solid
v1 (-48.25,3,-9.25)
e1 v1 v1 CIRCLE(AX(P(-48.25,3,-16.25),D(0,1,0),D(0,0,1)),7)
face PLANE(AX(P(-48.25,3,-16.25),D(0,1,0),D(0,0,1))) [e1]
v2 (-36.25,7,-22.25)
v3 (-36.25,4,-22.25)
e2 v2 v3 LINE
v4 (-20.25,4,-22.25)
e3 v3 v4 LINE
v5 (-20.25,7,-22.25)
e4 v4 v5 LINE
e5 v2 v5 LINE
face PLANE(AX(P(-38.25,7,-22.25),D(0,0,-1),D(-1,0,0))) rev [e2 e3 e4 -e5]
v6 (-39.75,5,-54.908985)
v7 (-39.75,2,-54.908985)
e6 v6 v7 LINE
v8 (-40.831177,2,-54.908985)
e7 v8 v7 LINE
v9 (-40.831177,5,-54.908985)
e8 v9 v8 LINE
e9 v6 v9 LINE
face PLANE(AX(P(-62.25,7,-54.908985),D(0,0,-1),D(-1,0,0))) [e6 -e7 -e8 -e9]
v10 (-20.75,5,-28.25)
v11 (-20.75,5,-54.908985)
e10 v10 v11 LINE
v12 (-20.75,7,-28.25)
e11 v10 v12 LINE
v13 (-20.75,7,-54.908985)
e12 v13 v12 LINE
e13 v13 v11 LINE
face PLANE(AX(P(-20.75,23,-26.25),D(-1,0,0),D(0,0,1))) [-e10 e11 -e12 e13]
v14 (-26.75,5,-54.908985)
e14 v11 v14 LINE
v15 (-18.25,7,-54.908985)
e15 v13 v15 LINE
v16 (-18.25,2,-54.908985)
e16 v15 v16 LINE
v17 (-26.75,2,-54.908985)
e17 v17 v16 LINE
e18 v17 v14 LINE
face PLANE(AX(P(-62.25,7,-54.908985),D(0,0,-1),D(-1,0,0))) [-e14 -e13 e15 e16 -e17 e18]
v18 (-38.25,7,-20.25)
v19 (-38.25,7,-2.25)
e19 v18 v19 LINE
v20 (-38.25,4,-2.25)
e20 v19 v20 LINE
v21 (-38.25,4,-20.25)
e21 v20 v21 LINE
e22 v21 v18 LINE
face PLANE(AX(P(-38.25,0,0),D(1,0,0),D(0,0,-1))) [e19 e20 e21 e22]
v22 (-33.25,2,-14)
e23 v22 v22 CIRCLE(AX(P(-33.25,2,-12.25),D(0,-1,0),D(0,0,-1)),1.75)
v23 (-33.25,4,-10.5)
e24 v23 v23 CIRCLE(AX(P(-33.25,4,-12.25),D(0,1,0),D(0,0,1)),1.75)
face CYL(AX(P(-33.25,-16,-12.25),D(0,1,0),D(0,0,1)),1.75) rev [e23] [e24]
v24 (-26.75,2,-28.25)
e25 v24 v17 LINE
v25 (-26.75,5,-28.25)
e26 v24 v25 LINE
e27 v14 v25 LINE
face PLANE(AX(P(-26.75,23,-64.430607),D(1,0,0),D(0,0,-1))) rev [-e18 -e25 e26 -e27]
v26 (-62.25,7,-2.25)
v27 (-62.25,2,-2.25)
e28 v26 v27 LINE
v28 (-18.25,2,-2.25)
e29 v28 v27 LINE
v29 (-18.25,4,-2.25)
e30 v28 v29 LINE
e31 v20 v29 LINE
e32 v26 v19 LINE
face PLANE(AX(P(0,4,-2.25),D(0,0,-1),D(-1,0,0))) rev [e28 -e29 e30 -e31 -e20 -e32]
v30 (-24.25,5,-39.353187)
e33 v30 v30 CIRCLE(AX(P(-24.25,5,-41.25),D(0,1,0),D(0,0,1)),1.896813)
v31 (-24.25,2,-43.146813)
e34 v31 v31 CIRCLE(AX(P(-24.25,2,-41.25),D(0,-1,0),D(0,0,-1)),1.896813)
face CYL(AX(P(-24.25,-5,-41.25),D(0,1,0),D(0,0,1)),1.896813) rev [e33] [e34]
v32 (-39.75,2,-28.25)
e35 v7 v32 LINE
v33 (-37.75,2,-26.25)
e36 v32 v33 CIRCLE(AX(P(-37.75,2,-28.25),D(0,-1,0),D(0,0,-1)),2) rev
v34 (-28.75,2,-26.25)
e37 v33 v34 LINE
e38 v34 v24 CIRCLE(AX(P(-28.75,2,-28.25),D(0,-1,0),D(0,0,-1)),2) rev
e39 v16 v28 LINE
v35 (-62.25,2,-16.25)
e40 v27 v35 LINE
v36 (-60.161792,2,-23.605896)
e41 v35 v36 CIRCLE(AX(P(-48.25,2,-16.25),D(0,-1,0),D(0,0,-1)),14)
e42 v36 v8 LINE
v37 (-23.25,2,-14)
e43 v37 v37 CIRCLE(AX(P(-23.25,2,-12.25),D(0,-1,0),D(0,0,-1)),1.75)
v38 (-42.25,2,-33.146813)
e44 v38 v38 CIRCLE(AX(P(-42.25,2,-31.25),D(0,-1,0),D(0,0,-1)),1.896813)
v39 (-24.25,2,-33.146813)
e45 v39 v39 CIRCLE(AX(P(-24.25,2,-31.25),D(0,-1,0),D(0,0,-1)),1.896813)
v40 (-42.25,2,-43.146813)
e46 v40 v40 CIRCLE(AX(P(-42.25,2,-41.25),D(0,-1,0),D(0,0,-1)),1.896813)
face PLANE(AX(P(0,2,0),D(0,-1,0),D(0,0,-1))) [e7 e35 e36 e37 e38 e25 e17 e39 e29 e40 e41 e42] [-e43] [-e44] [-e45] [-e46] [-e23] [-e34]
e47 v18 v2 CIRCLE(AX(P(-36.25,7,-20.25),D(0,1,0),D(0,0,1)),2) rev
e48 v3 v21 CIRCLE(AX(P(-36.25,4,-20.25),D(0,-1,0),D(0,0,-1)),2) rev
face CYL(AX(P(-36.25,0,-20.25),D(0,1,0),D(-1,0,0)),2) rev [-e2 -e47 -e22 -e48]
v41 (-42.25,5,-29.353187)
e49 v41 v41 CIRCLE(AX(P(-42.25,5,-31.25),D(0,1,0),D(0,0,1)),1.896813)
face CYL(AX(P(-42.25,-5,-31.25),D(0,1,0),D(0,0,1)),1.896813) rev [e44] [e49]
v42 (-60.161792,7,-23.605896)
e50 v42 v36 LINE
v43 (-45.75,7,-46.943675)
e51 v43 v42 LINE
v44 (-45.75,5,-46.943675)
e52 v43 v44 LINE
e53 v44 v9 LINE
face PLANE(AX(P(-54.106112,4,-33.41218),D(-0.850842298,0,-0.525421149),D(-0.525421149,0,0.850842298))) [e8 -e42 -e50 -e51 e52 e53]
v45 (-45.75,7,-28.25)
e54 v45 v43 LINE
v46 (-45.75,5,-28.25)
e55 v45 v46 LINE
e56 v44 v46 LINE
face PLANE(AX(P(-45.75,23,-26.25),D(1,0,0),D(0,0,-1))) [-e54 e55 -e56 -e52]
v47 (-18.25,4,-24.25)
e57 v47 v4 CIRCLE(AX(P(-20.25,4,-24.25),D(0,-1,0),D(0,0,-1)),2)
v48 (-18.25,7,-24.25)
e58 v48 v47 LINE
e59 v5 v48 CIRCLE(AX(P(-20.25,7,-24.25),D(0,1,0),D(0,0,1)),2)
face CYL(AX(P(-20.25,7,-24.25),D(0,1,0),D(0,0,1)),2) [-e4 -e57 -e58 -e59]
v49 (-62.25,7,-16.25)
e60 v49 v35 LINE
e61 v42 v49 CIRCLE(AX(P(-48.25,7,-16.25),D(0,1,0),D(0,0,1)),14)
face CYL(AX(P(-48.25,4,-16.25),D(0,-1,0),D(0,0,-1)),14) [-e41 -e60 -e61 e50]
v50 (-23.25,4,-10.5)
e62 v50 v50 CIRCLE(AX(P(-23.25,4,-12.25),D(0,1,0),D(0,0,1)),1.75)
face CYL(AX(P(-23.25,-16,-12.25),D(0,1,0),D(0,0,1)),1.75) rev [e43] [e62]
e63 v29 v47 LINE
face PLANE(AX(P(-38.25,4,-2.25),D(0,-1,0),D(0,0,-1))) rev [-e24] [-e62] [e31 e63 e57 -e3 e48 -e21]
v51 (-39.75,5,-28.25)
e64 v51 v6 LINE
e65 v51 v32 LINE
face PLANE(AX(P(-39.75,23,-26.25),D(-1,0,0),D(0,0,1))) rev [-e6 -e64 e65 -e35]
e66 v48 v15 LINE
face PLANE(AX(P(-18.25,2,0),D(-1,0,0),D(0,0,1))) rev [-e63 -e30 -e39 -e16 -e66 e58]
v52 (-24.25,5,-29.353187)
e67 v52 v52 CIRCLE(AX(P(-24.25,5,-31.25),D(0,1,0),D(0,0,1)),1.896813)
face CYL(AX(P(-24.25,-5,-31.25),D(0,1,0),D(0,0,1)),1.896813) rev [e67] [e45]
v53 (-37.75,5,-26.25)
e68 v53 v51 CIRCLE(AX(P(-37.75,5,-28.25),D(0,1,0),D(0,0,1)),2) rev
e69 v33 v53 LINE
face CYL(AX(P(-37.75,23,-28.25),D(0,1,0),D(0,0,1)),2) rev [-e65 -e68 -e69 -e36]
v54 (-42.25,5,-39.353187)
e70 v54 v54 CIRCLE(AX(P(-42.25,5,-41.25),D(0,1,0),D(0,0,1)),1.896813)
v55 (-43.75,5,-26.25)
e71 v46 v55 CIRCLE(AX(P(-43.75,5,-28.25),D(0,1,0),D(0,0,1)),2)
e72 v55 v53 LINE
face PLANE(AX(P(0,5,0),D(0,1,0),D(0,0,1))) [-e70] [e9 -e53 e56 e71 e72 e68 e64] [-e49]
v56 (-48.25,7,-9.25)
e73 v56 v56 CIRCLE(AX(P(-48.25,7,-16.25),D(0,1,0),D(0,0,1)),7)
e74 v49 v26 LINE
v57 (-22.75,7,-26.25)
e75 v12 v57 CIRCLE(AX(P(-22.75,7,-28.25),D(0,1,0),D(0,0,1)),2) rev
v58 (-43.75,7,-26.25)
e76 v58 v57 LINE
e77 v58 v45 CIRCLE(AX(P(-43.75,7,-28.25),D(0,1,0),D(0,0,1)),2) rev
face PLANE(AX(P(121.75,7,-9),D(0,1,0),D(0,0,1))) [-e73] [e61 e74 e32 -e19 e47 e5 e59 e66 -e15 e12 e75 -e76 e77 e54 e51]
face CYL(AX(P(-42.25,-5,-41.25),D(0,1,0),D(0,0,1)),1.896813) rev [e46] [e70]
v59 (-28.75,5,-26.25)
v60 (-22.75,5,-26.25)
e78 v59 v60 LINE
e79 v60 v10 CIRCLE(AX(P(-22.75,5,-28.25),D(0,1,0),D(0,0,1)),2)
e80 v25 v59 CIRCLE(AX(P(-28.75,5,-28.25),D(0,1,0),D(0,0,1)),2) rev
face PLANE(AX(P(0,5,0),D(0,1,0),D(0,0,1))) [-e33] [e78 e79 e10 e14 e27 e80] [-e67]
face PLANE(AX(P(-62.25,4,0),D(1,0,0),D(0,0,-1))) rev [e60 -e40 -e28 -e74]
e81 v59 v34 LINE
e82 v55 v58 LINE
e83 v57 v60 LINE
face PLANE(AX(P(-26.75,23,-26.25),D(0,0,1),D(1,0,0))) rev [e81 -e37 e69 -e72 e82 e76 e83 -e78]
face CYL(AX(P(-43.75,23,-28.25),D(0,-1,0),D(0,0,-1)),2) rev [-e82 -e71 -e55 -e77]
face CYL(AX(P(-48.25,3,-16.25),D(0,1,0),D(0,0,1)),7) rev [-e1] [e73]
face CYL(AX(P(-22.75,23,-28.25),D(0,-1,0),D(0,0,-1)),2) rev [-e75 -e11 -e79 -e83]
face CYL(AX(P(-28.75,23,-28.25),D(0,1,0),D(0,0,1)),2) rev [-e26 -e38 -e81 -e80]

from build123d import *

# Parameters (mm, degrees)
SKETCH_1_W           = 35
SKETCH_1_H           = 55
EXTRUDE_1_DEPTH      = 1
EXTRUDE_2_DEPTH      = 3
SKETCH_3_R           = 5
CUT_EXTRUDE_1_DEPTH  = 169.569903897
SKETCH_4_R           = 4
CUT_EXTRUDE_2_DEPTH  = 2
SKETCH_5_R           = 2
CUT_EXTRUDE_3_DEPTH  = 2
EXTRUDE_START        = 7
EXTRUDE_3_DEPTH      = 7
CUT_EXTRUDE_START    = -1.5
SKETCH_9_W           = 10
SKETCH_9_H           = 26
CUT_EXTRUDE_4_DEPTH  = 168.318874833
SKETCH_10_R          = 1.5
CUT_EXTRUDE_5_DEPTH  = 194.595583627
EXTRUDE_4_DEPTH      = 3
SKETCH_13_W          = 334.012533363
SKETCH_13_H          = 161.456209481
CUT_EXTRUDE_6_DEPTH  = 10
CUT_EXTRUDE_START_2  = -0.5
SKETCH_14_R          = 3.5
CUT_EXTRUDE_7_DEPTH  = 179.354165453
SKETCH_15_R          = 5
CUT_EXTRUDE_8_DEPTH  = 179.854165453
EXTRUDE_START_2      = -3
EXTRUDE_5_DEPTH      = 16
EXTRUDE_7_DEPTH      = 7
SKETCH_24_W          = 10
SKETCH_24_H          = 26
CUT_EXTRUDE_11_DEPTH = 180.209193181
SKETCH_25_R          = 1.5
CUT_EXTRUDE_12_DEPTH = 176.793913433
THREAD_2_PITCH       = 0.6
CUT_EXTRUDE_13_DEPTH = 181.709193232
EXTRUDE_START_3      = 2
SKETCH_27_R          = 5
EXTRUDE_8_DEPTH      = 2
CUT_EXTRUDE_START_3  = -2
SKETCH_28_W          = 25
SKETCH_28_H          = 47.640496167
CUT_EXTRUDE_14_DEPTH = 182.247184378
SKETCH_29_R          = 7
CUT_EXTRUDE_15_DEPTH = 4
CUT_EXTRUDE_16_DEPTH = 10
SKETCH_32_R          = 1.896812978
CUT_EXTRUDE_17_DEPTH = 10
CUT_EXTRUDE_START_4  = -19
CUT_EXTRUDE_18_DEPTH = 2
CUT_EXTRUDE_19_DEPTH = 180.762490825
CUT_EXTRUDE_20_DEPTH = 176.782687167
CUT_EXTRUDE_21_DEPTH = 175.343166372
SKETCH_37_R          = 1
CUT_EXTRUDE_22_DEPTH = 175.199743974
EXTRUDE_START_4      = -1
SKETCH_39_R          = 5
EXTRUDE_9_DEPTH      = 1
SKETCH_40_W          = 2.395962652
SKETCH_40_H          = 5.687033247
CUT_EXTRUDE_23_DEPTH = 192.518571686
SKETCH_41_W          = 84.482618637
SKETCH_41_H          = 34.951738984
CUT_EXTRUDE_24_DEPTH = 192.518571686
SKETCH_42_W          = 20
SKETCH_42_H          = 3
CUT_EXTRUDE_25_DEPTH = 20
CUT_EXTRUDE_26_DEPTH = 20
FILLET_1_R           = 2
FILLET_2_R           = 2


with BuildPart() as part:
    # 草图1 → 凸台-拉伸1 (new body)
    with BuildSketch(Plane(origin=(0, 0, 0), x_dir=(1, 0, 0), z_dir=(0, 1, 0))):
        Rectangle(SKETCH_1_W, SKETCH_1_H)
    extrude(amount=EXTRUDE_1_DEPTH)

    # Sketch 2 → 凸台-拉伸2 (add)
    with BuildSketch(Plane(origin=(0, 1, 0), x_dir=(1, 0, 0), z_dir=(0, 1, 0))):
        with BuildLine():
            Line((106.75, -2.25), (106.75, 2.25))
            Line((106.75, 2.25), (121.75, 2.25))
            ThreePointArc((121.75, 2.25), (122.922125199, 2.352547667), (124.058635967, 2.65707481))
            Line((124.058635967, 2.65707481), (154.058635967, 13.576181838))
            ThreePointArc((154.058635967, 13.576181838), (158.397452333, 21.091232227), (151.75, 26.669107028))
            Line((151.75, 26.669107028), (-31.447415548, 57.101298968))
            ThreePointArc((-31.447415548, 57.101298968), (-37.800418235, 56.264673928), (-42.609265279, 52.029632639))
            Line((-42.609265279, 52.029632639), (-60.161792173, 23.605896086))
            ThreePointArc((-60.161792173, 23.605896086), (-61.717833724, 20.073278016), (-62.25, 16.25))
            Line((-62.25, 16.25), (-62.25, -16.25))
            ThreePointArc((-62.25, -16.25), (-61.717833724, -20.073278016), (-60.161792173, -23.605896086))
            Line((-60.161792173, -23.605896086), (-42.609265279, -52.029632639))
            ThreePointArc((-42.609265279, -52.029632639), (-37.800418235, -56.264673928), (-31.447415548, -57.101298968))
            Line((-31.447415548, -57.101298968), (151.75, -26.669107028))
            ThreePointArc((151.75, -26.669107028), (158.397452333, -21.091232227), (154.058635967, -13.576181838))
            Line((154.058635967, -13.576181838), (124.058635967, -2.65707481))
            ThreePointArc((124.058635967, -2.65707481), (122.922125199, -2.352547667), (121.75, -2.25))
            Line((121.75, -2.25), (106.75, -2.25))
        make_face()
    extrude(amount=EXTRUDE_2_DEPTH)

    # 草图3 → 切除-拉伸1 (cut, through all)
    with BuildSketch(Plane(origin=(0, 4, 0), x_dir=(1, 0, 0), z_dir=(0, 1, 0))):
        with Locations(Location((-48.25, 16.25, 0), (0, 0, 270))):
            Circle(SKETCH_3_R)
        with Locations(Location((-48.25, -16.25, 0), (0, 0, 270))):
            Circle(SKETCH_3_R)
    extrude(amount=-CUT_EXTRUDE_1_DEPTH, mode=Mode.SUBTRACT)

    # 草图4 → 切除-拉伸2 (cut)
    with BuildSketch(Plane(origin=(0, 4, 0), x_dir=(1, 0, 0), z_dir=(0, 1, 0))):
        with Locations(Location((-33.25, 46.25, 0), (0, 0, 270))):
            Circle(SKETCH_4_R)
        with Locations(Location((-33.25, -46.25, 0), (0, 0, 270))):
            Circle(SKETCH_4_R)
    extrude(amount=-CUT_EXTRUDE_2_DEPTH, mode=Mode.SUBTRACT)

    # 草图5 → 切除-拉伸3 (cut)
    with BuildSketch(Plane(origin=(0, 4, 0), x_dir=(1, 0, 0), z_dir=(0, 1, 0))):
        with Locations(Location((121.75, 9, 0), (0, 0, 270))):
            Circle(SKETCH_5_R)
        with Locations(Location((121.75, -9, 0), (0, 0, 270))):
            Circle(SKETCH_5_R)
        with Locations(Location((151.75, 19.919107028, 0), (0, 0, 270))):
            Circle(SKETCH_5_R)
        with Locations(Location((151.75, -19.919107028, 0), (0, 0, 270))):
            Circle(SKETCH_5_R)
    extrude(amount=-CUT_EXTRUDE_3_DEPTH, mode=Mode.SUBTRACT)

    # 草图8 → 凸台-拉伸3 (add)
    with BuildSketch(Plane.XZ.offset(-1).offset(EXTRUDE_START)):
        with BuildLine():
            Line((-26.75, -26.25), (-39.75, -26.25))
            Line((-39.75, -26.25), (-39.75, -55.124119675))
            ThreePointArc((-39.75, -55.124119675), (-35.798281322, -56.950759894), (-31.447415548, -57.101298968))
            Line((-31.447415548, -57.101298968), (-26.75, -56.320978726))
            Line((-26.75, -56.320978726), (-26.75, -26.25))
        make_face()
    extrude_3 = extrude(amount=-EXTRUDE_3_DEPTH)

    # 镜向1: 凸台-拉伸3 across plane
    add(extrude_3.mirror(Plane.XY))

    # 草图9 → 切除-拉伸4 (cut, through all)
    with BuildSketch(Plane.XZ.offset(6).offset(CUT_EXTRUDE_START)):
        with Locations((-33.25, -40.75)):
            Rectangle(SKETCH_9_W, SKETCH_9_H)
    cut_extrude_4 = extrude(amount=-CUT_EXTRUDE_4_DEPTH, mode=Mode.SUBTRACT)

    # 镜向2: 切除-拉伸4 across plane
    add(cut_extrude_4.mirror(Plane.XY), mode=Mode.SUBTRACT)

    # 草图10 → 切除-拉伸5 (cut, through all)
    with BuildSketch(Plane.XY.offset(-53.75)):
        with Locations((-33.25, -1.5)):
            Circle(SKETCH_10_R)
    cut_extrude_5 = extrude(amount=-CUT_EXTRUDE_5_DEPTH, mode=Mode.SUBTRACT)

    # 镜向3: 切除-拉伸5 across plane
    add(cut_extrude_5.mirror(Plane.XY), mode=Mode.SUBTRACT)

    # 草图12 → 凸台-拉伸4 (add)
    with BuildSketch(Plane(origin=(0, 4, 0), x_dir=(1, 0, 0), z_dir=(0, 1, 0))):
        with BuildLine():
            Line((152.536154407, 34.648141662), (-30.136445037, 64.993152763))
            ThreePointArc((-30.136445037, 64.993152763), (-32.296727103, 65.226071005), (-34.469475839, 65.210824842))
            Line((-34.469475839, 65.210824842), (-60.161792173, 23.605896086))
            ThreePointArc((-60.161792173, 23.605896086), (-61.717833724, 20.073278016), (-62.25, 16.25))
            Line((-62.25, 16.25), (-62.25, 2.25))
            Line((-62.25, 2.25), (121.75, 2.25))
            ThreePointArc((121.75, 2.25), (122.922125199, 2.352547667), (124.058635967, 2.65707481))
            Line((124.058635967, 2.65707481), (166.382589153, 18.061733966))
            ThreePointArc((166.382589153, 18.061733966), (163.073058037, 29.371665237), (152.536154407, 34.648141662))
        make_face()
    extrude(amount=EXTRUDE_4_DEPTH)

    # 草图13 → 切除-拉伸6 (cut)
    with BuildSketch(Plane.XZ.offset(-4)):
        with Locations((47.836319436, 6.16656882)):
            Rectangle(SKETCH_13_W, SKETCH_13_H)
    extrude(amount=CUT_EXTRUDE_6_DEPTH, mode=Mode.SUBTRACT)

    # 草图14 → 切除-拉伸7 (cut, through all)
    with BuildSketch(Plane.XZ.offset(-4).offset(CUT_EXTRUDE_START_2)):
        with Locations(Location((151.75, -19.919107028, 0), (0, 0, 270))):
            Circle(SKETCH_14_R)
        with Locations(Location((121.75, -9, 0), (0, 0, 270))):
            Circle(SKETCH_14_R)
    extrude(amount=-CUT_EXTRUDE_7_DEPTH, mode=Mode.SUBTRACT)

    # 草图15 → 切除-拉伸8 (cut, through all)
    with BuildSketch(Plane.XZ.offset(-4)):
        with Locations(Location((-48.25, -16.25, 0), (0, 0, 270))):
            Circle(SKETCH_15_R)
    extrude(amount=-CUT_EXTRUDE_8_DEPTH, mode=Mode.SUBTRACT)

    # 草图17 → 凸台-拉伸5 (add)
    with BuildSketch(Plane.XZ.offset(-4).offset(EXTRUDE_START_2)):
        with BuildLine():
            Line((-30.628058978, -62.03370759), (152.218782473, -31.659751942))
            ThreePointArc((152.218782473, -31.659751942), (161.216553887, -26.879484712), (163.096310198, -16.865626245))
            Line((163.096310198, -16.865626245), (166.382589153, -18.061733966))
            ThreePointArc((166.382589153, -18.061733966), (163.073058037, -29.371665237), (152.536154407, -34.648141662))
            Line((152.536154407, -34.648141662), (-30.136445037, -64.993152763))
            ThreePointArc((-30.136445037, -64.993152763), (-32.296727103, -65.226071005), (-34.469475839, -65.210824842))
            Line((-34.469475839, -65.210824842), (-36.504423199, -61.915526791))
            ThreePointArc((-36.504423199, -61.915526791), (-33.571714316, -62.246765295), (-30.628058978, -62.03370759))
        make_face()
    extrude(amount=-EXTRUDE_5_DEPTH)

    # 草图23 → 凸台-拉伸7 (add)
    with BuildSketch(Plane.XZ.offset(-4).offset(EXTRUDE_START)):
        with BuildLine():
            Line((-39.75, -56.65979236), (-39.75, -26.25))
            Line((-39.75, -26.25), (-26.75, -26.25))
            Line((-26.75, -26.25), (-26.75, -64.430606916))
            Line((-26.75, -64.430606916), (-30.136445037, -64.993152763))
            ThreePointArc((-30.136445037, -64.993152763), (-32.296727103, -65.226071005), (-34.469475839, -65.210824842))
            Line((-34.469475839, -65.210824842), (-39.75, -56.65979236))
        make_face()
    extrude(amount=-EXTRUDE_7_DEPTH)

    # 草图24 → 切除-拉伸11 (cut, through all)
    with BuildSketch(Plane.XZ.offset(3).offset(CUT_EXTRUDE_START)):
        with Locations((-33.25, -40.75)):
            Rectangle(SKETCH_24_W, SKETCH_24_H)
    extrude(amount=-CUT_EXTRUDE_11_DEPTH, mode=Mode.SUBTRACT)

    # 草图25 → 切除-拉伸12 (cut, through all)
    with BuildSketch(Plane.XY.offset(-53.75)):
        with Locations((-33.25, 1.5)):
            Circle(SKETCH_25_R)
    extrude(amount=-CUT_EXTRUDE_12_DEPTH, mode=Mode.SUBTRACT)

    # 螺纹线2: the profile of Sketch 2 2 profile screwed along a right-hand helix of 25 turns, 6 arcs to a turn; built about Z, then put on its axis
    thread_2_z = Axis((0, 0, 0), (0, 0, 1))
    thread_2_corners = [(1.4997, 0, -0.000173205), (1.824759525, 0, 0.187499999), (1.824759525, 0, 0.262499999), (1.4997, 0, 0.450173203)]
    with BuildLine(mode=Mode.PRIVATE) as thread_2_profile:
        Line(thread_2_corners[0], thread_2_corners[1])
        Line(thread_2_corners[1], thread_2_corners[2])
        Line(thread_2_corners[2], thread_2_corners[3])
        Line(thread_2_corners[3], thread_2_corners[0])
    thread_2_cap = Face(thread_2_profile.wire())
    thread_2_turn_angles = [0, 30, 60, 90, 120, 150, 180, 210, 240, 270, 300, 330, 360]
    thread_2_turn_weights = [1, 0.8660254037844387, 1, 0.8660254037844387, 1, 0.8660254037844387, 1, 0.8660254037844387, 1, 0.8660254037844387, 1, 0.8660254037844387, 1]
    thread_2_turn_rails = [Edge.make_bspline([Vector(p[0], p[1], 0).rotate(thread_2_z, thread_2_turn_angles[k]) / thread_2_turn_weights[k] + Vector(0, 0, p[2] + THREAD_2_PITCH * thread_2_turn_angles[k] / 360) for k in range(13)], [0, 0, 0, 1, 1, 2, 2, 3, 3, 4, 4, 5, 5, 6, 6, 6], 2, thread_2_turn_weights) for p in thread_2_corners]
    thread_2_turn_sides = [Face.make_surface_from_curves(thread_2_turn_rails[p[0]], thread_2_turn_rails[p[1]]) for p in [(0, 1), (1, 2), (2, 3), (3, 0)]]
    thread_2 = Plane(origin=(-33.25, 1.5, -53.75), x_dir=(-1, 0, 0), z_dir=(0, 0, -1)) * Solid(Shell([*[p.moved(Location((0, 0, THREAD_2_PITCH * i))) for i in range(25) for p in thread_2_turn_sides], thread_2_cap, thread_2_cap.rotate(thread_2_z, 9000).moved(Location((0, 0, THREAD_2_PITCH * 9000 / 360)))]))
    add(thread_2, mode=Mode.SUBTRACT)

    # 草图26 → 切除-拉伸13 (cut, through all)
    with BuildSketch(Plane.XZ.offset(3)):
        with BuildLine():
            Line((-26.75, -64.430606916), (-26.75, -26.25))
            Line((-26.75, -26.25), (-39.75, -26.25))
            Line((-39.75, -26.25), (-39.75, -56.65979236))
            Line((-39.75, -56.65979236), (-34.469475839, -65.210824842))
            ThreePointArc((-34.469475839, -65.210824842), (-32.296727103, -65.226071005), (-30.136445037, -64.993152763))
            Line((-30.136445037, -64.993152763), (-26.75, -64.430606916))
        make_face()
    extrude(amount=-CUT_EXTRUDE_13_DEPTH, mode=Mode.SUBTRACT)

    # 草图27 → 凸台-拉伸8 (add)
    with BuildSketch(Plane.XZ.offset(-4).offset(EXTRUDE_START_3)):
        with BuildLine():
            Line((-39.75, -56.65979236), (-39.75, -26.25))
            Line((-39.75, -26.25), (-26.75, -26.25))
            Line((-26.75, -26.25), (-26.75, -64.430606916))
            Line((-26.75, -64.430606916), (-18.25, -63.018613025))
            Line((-18.25, -63.018613025), (-18.25, -2.25))
            Line((-18.25, -2.25), (-62.25, -2.25))
            Line((-62.25, -2.25), (-62.25, -16.25))
            ThreePointArc((-62.25, -16.25), (-61.717833724, -20.073278016), (-60.161792173, -23.605896086))
            Line((-60.161792173, -23.605896086), (-39.75, -56.65979236))
        make_face()
        with Locations(Location((-48.25, -16.25, 0), (0, 0, 270))):
            Circle(SKETCH_27_R, mode=Mode.SUBTRACT)
    extrude(amount=-EXTRUDE_8_DEPTH)

    # 草图28 → 切除-拉伸14 (cut, through all)
    with BuildSketch(Plane(origin=(0, 7, 0), x_dir=(1, 0, 0), z_dir=(0, 1, 0)).offset(CUT_EXTRUDE_START_3)):
        with Locations((-33.25, 50.070248084)):
            Rectangle(SKETCH_28_W, SKETCH_28_H)
    extrude(amount=CUT_EXTRUDE_14_DEPTH, mode=Mode.SUBTRACT)

    # 草图29 → 切除-拉伸15 (cut)
    with BuildSketch(Plane(origin=(0, 7, 0), x_dir=(1, 0, 0), z_dir=(0, 1, 0))):
        with Locations(Location((-48.25, 16.25, 0), (0, 0, 270))):
            Circle(SKETCH_29_R)
    extrude(amount=-CUT_EXTRUDE_15_DEPTH, mode=Mode.SUBTRACT)

    # 草图31 → 切除-拉伸16 (cut)
    with BuildSketch(Plane.XZ.offset(-4)):
        with BuildLine():
            Line((7.5, -16.25), (0, -16.25))
            ThreePointArc((0, -16.25), (0.512563133, -17.487436867), (1.75, -18))
            Line((1.75, -18), (5.75, -18))
            ThreePointArc((5.75, -18), (6.987436867, -17.487436867), (7.5, -16.25))
        make_face()
        with BuildLine():
            ThreePointArc((1.75, -14.5), (0.512563133, -15.012563133), (0, -16.25))
            Line((0, -16.25), (7.5, -16.25))
            ThreePointArc((7.5, -16.25), (6.987436867, -15.012563133), (5.75, -14.5))
            Line((5.75, -14.5), (1.75, -14.5))
        make_face()
        with BuildLine():
            Line((47.5, -16.25), (40, -16.25))
            ThreePointArc((40, -16.25), (40.512563133, -17.487436867), (41.75, -18))
            Line((41.75, -18), (45.75, -18))
            ThreePointArc((45.75, -18), (46.987436867, -17.487436867), (47.5, -16.25))
        make_face()
        with BuildLine():
            ThreePointArc((41.75, -14.5), (40.512563133, -15.012563133), (40, -16.25))
            Line((40, -16.25), (47.5, -16.25))
            ThreePointArc((47.5, -16.25), (46.987436867, -15.012563133), (45.75, -14.5))
            Line((45.75, -14.5), (41.75, -14.5))
        make_face()
        with BuildLine():
            ThreePointArc((81.75, -14.5), (80.512563133, -15.012563133), (80, -16.25))
            Line((80, -16.25), (87.5, -16.25))
            ThreePointArc((87.5, -16.25), (86.987436867, -15.012563133), (85.75, -14.5))
            Line((85.75, -14.5), (81.75, -14.5))
        make_face()
        with BuildLine():
            Line((87.5, -16.25), (80, -16.25))
            ThreePointArc((80, -16.25), (80.512563133, -17.487436867), (81.75, -18))
            Line((81.75, -18), (85.75, -18))
            ThreePointArc((85.75, -18), (86.987436867, -17.487436867), (87.5, -16.25))
        make_face()
        with BuildLine():
            Line((0, -31.25), (0, -35.25))
            ThreePointArc((0, -35.25), (1.75, -37), (3.5, -35.25))
            Line((3.5, -35.25), (3.5, -31.25))
            ThreePointArc((3.5, -31.25), (1.75, -29.5), (0, -31.25))
        make_face()
    extrude(amount=-CUT_EXTRUDE_16_DEPTH, mode=Mode.SUBTRACT)

    # 草图32 → 切除-拉伸17 (cut)
    with BuildSketch(Plane(origin=(0, 5, 0), x_dir=(1, 0, 0), z_dir=(0, 1, 0))):
        with Locations(Location((-42.25, 41.25, 0), (0, 0, 270))):
            Circle(SKETCH_32_R)
        with Locations(Location((-42.25, 31.25, 0), (0, 0, 270))):
            Circle(SKETCH_32_R)
        with Locations(Location((-24.25, 41.25, 0), (0, 0, 270))):
            Circle(SKETCH_32_R)
        with Locations(Location((-24.25, 31.25, 0), (0, 0, 270))):
            Circle(SKETCH_32_R)
    extrude(amount=-CUT_EXTRUDE_17_DEPTH, mode=Mode.SUBTRACT)

    # 草图33 → 切除-拉伸18 (cut)
    with BuildSketch(Plane(origin=(0, 23, 0), x_dir=(1, 0, 0), z_dir=(0, 1, 0)).offset(CUT_EXTRUDE_START_4)):
        with BuildLine():
            Line((-26.75, 56.320978726), (151.75, 26.669107028))
            ThreePointArc((151.75, 26.669107028), (158.397452333, 21.091232227), (154.058635967, 13.576181838))
            Line((154.058635967, 13.576181838), (163.096310198, 16.865626245))
            Line((163.096310198, 16.865626245), (166.382589153, 18.061733966))
            ThreePointArc((166.382589153, 18.061733966), (163.073058037, 29.371665237), (152.536154407, 34.648141662))
            Line((152.536154407, 34.648141662), (-20.75, 63.433905346))
            Line((-20.75, 63.433905346), (-26.75, 64.430606916))
            Line((-26.75, 64.430606916), (-26.75, 56.320978726))
        make_face()
    extrude(amount=CUT_EXTRUDE_18_DEPTH, mode=Mode.SUBTRACT)

    # 草图34 → 切除-拉伸19 (cut, through all)
    with BuildSketch(Plane(origin=(0, 23, 0), x_dir=(1, 0, 0), z_dir=(0, 1, 0))):
        with BuildLine():
            Line((152.536154407, 34.648141662), (-20.75, 63.433905346))
            Line((-20.75, 63.433905346), (-20.75, 60.392794775))
            Line((-20.75, 60.392794775), (152.218782473, 31.659751942))
            ThreePointArc((152.218782473, 31.659751942), (161.216553887, 26.879484712), (163.096310198, 16.865626245))
            Line((163.096310198, 16.865626245), (166.382589153, 18.061733966))
            ThreePointArc((166.382589153, 18.061733966), (163.073058037, 29.371665237), (152.536154407, 34.648141662))
        make_face()
    extrude(amount=-CUT_EXTRUDE_19_DEPTH, mode=Mode.SUBTRACT)

    # 草图35 → 切除-拉伸20 (cut, through all)
    with BuildSketch(Plane.XZ.offset(-6)):
        Polygon((-20.75, -60.392794775), (-20.75, -55.324277157), (-34.501982631, -57.608714269), (-32.134133376, -71.862825995), (-8.577554705, -67.949679505), (-10.126047391, -58.627976401), align=None)
        Polygon((-10.94540396, -53.695567779), (-20.75, -55.324277157), (-20.75, -60.392794775), (-10.126047391, -58.627976401), align=None)
    extrude(amount=CUT_EXTRUDE_20_DEPTH, mode=Mode.SUBTRACT)

    # 草图36 → 切除-拉伸21 (cut, through all)
    with BuildSketch(Plane.XZ.offset(-6)):
        Polygon((-18.25, -54.908984836), (-18.25, -59.977502454), (-20.75, -60.392794775), (-20.75, -55.324277157), align=None)
    extrude(amount=-CUT_EXTRUDE_21_DEPTH, mode=Mode.SUBTRACT)

    # 草图37 → 切除-拉伸22 (cut, through all)
    with BuildSketch(Plane.XZ.offset(-6)):
        with BuildLine():
            ThreePointArc((12.330933455, -52.363232915), (11.180580417, -51.540622505), (10.357970006, -52.690975543))
            Line((10.357970006, -52.690975543), (12.330933455, -52.363232915))
        make_face()
        with BuildLine():
            Line((12.330933455, -52.363232915), (10.357970006, -52.690975543))
            ThreePointArc((10.357970006, -52.690975543), (11.426665707, -53.52371893), (12.344451731, -52.527104229))
            ThreePointArc((12.344451731, -52.527104229), (12.341066432, -52.444890254), (12.330933455, -52.363232915))
        make_face()
        with BuildLine():
            ThreePointArc((130.708740378, -32.698675253), (129.55838734, -31.876064842), (128.73577693, -33.02641788))
            Line((128.73577693, -33.02641788), (130.708740378, -32.698675253))
        make_face()
        with BuildLine():
            Line((130.708740378, -32.698675253), (128.73577693, -33.02641788))
            ThreePointArc((128.73577693, -33.02641788), (129.80447263, -33.859161267), (130.722258654, -32.862546567))
            ThreePointArc((130.722258654, -32.862546567), (130.718873355, -32.780332591), (130.708740378, -32.698675253))
        make_face()
        with Locations(Location((50.803720705, -45.972251675, 0), (0, 0, 270))):
            Circle(SKETCH_37_R)
        with Locations(Location((90.26298968, -39.417399121, 0), (0, 0, 270))):
            Circle(SKETCH_37_R)
    extrude(amount=-CUT_EXTRUDE_22_DEPTH, mode=Mode.SUBTRACT)

    # 草图39 → 凸台-拉伸9 (add)
    with BuildSketch(Plane(origin=(0, 3, 0), x_dir=(1, 0, 0), z_dir=(0, 1, 0)).offset(EXTRUDE_START_4)):
        with Locations((-48.25, 16.25)):
            Circle(SKETCH_39_R)
    extrude(amount=EXTRUDE_9_DEPTH)

    # 草图40 → 切除-拉伸23 (cut, through all)
    with BuildSketch(Plane.ZY.offset(18.25)):
        with Locations((-56.106966162, 4.156483376)):
            Rectangle(SKETCH_40_W, SKETCH_40_H)
    extrude(amount=CUT_EXTRUDE_23_DEPTH, mode=Mode.SUBTRACT)

    # 草图41 → 切除-拉伸24 (cut, through all)
    with BuildSketch(Plane(origin=(-18.25, 0, 0), x_dir=(0, 0, -1), z_dir=(1, 0, 0))):
        with Locations((24.58815333, 3.204195378)):
            Rectangle(SKETCH_41_W, SKETCH_41_H)
    extrude(amount=CUT_EXTRUDE_24_DEPTH, mode=Mode.SUBTRACT)

    # 草图42 → 切除-拉伸25 (cut)
    with BuildSketch(Plane(origin=(-18.25, 0, 0), x_dir=(0, 0, -1), z_dir=(1, 0, 0))):
        with Locations((12.25, 5.5)):
            Rectangle(SKETCH_42_W, SKETCH_42_H)
    extrude(amount=-CUT_EXTRUDE_25_DEPTH, mode=Mode.SUBTRACT)

    # 草图43 → 切除-拉伸26 (cut)
    with BuildSketch(Plane(origin=(0, 4, 0), x_dir=(1, 0, 0), z_dir=(0, 1, 0))):
        with BuildLine():
            ThreePointArc((-35, 12.25), (-33.25, 10.5), (-31.5, 12.25))
            Line((-31.5, 12.25), (-35, 12.25))
        make_face()
        with BuildLine():
            Line((-35, 12.25), (-31.5, 12.25))
            ThreePointArc((-31.5, 12.25), (-33.25, 14), (-35, 12.25))
        make_face()
        with BuildLine():
            ThreePointArc((-25, 12.25), (-23.25, 10.5), (-21.5, 12.25))
            Line((-21.5, 12.25), (-25, 12.25))
        make_face()
        with BuildLine():
            Line((-25, 12.25), (-21.5, 12.25))
            ThreePointArc((-21.5, 12.25), (-23.25, 14), (-25, 12.25))
        make_face()
    extrude(amount=-CUT_EXTRUDE_26_DEPTH, mode=Mode.SUBTRACT)

    # 圆角1
    fillet_1_edges = [part.edges().sort_by_distance(p)[0] for p in [
        (-26.75, 3.5, -26.25),
        (-39.75, 3.5, -26.25),
        (-20.75, 6, -26.25),
        (-45.75, 6, -26.25),
    ]]
    fillet(fillet_1_edges, radius=FILLET_1_R)

    # 圆角2
    fillet_2_edges = [part.edges().sort_by_distance(p)[0] for p in [
        (-38.25, 5.5, -22.25),
        (-18.25, 5.5, -22.25),
    ]]
    fillet(fillet_2_edges, radius=FILLET_2_R)


solid = part.part
